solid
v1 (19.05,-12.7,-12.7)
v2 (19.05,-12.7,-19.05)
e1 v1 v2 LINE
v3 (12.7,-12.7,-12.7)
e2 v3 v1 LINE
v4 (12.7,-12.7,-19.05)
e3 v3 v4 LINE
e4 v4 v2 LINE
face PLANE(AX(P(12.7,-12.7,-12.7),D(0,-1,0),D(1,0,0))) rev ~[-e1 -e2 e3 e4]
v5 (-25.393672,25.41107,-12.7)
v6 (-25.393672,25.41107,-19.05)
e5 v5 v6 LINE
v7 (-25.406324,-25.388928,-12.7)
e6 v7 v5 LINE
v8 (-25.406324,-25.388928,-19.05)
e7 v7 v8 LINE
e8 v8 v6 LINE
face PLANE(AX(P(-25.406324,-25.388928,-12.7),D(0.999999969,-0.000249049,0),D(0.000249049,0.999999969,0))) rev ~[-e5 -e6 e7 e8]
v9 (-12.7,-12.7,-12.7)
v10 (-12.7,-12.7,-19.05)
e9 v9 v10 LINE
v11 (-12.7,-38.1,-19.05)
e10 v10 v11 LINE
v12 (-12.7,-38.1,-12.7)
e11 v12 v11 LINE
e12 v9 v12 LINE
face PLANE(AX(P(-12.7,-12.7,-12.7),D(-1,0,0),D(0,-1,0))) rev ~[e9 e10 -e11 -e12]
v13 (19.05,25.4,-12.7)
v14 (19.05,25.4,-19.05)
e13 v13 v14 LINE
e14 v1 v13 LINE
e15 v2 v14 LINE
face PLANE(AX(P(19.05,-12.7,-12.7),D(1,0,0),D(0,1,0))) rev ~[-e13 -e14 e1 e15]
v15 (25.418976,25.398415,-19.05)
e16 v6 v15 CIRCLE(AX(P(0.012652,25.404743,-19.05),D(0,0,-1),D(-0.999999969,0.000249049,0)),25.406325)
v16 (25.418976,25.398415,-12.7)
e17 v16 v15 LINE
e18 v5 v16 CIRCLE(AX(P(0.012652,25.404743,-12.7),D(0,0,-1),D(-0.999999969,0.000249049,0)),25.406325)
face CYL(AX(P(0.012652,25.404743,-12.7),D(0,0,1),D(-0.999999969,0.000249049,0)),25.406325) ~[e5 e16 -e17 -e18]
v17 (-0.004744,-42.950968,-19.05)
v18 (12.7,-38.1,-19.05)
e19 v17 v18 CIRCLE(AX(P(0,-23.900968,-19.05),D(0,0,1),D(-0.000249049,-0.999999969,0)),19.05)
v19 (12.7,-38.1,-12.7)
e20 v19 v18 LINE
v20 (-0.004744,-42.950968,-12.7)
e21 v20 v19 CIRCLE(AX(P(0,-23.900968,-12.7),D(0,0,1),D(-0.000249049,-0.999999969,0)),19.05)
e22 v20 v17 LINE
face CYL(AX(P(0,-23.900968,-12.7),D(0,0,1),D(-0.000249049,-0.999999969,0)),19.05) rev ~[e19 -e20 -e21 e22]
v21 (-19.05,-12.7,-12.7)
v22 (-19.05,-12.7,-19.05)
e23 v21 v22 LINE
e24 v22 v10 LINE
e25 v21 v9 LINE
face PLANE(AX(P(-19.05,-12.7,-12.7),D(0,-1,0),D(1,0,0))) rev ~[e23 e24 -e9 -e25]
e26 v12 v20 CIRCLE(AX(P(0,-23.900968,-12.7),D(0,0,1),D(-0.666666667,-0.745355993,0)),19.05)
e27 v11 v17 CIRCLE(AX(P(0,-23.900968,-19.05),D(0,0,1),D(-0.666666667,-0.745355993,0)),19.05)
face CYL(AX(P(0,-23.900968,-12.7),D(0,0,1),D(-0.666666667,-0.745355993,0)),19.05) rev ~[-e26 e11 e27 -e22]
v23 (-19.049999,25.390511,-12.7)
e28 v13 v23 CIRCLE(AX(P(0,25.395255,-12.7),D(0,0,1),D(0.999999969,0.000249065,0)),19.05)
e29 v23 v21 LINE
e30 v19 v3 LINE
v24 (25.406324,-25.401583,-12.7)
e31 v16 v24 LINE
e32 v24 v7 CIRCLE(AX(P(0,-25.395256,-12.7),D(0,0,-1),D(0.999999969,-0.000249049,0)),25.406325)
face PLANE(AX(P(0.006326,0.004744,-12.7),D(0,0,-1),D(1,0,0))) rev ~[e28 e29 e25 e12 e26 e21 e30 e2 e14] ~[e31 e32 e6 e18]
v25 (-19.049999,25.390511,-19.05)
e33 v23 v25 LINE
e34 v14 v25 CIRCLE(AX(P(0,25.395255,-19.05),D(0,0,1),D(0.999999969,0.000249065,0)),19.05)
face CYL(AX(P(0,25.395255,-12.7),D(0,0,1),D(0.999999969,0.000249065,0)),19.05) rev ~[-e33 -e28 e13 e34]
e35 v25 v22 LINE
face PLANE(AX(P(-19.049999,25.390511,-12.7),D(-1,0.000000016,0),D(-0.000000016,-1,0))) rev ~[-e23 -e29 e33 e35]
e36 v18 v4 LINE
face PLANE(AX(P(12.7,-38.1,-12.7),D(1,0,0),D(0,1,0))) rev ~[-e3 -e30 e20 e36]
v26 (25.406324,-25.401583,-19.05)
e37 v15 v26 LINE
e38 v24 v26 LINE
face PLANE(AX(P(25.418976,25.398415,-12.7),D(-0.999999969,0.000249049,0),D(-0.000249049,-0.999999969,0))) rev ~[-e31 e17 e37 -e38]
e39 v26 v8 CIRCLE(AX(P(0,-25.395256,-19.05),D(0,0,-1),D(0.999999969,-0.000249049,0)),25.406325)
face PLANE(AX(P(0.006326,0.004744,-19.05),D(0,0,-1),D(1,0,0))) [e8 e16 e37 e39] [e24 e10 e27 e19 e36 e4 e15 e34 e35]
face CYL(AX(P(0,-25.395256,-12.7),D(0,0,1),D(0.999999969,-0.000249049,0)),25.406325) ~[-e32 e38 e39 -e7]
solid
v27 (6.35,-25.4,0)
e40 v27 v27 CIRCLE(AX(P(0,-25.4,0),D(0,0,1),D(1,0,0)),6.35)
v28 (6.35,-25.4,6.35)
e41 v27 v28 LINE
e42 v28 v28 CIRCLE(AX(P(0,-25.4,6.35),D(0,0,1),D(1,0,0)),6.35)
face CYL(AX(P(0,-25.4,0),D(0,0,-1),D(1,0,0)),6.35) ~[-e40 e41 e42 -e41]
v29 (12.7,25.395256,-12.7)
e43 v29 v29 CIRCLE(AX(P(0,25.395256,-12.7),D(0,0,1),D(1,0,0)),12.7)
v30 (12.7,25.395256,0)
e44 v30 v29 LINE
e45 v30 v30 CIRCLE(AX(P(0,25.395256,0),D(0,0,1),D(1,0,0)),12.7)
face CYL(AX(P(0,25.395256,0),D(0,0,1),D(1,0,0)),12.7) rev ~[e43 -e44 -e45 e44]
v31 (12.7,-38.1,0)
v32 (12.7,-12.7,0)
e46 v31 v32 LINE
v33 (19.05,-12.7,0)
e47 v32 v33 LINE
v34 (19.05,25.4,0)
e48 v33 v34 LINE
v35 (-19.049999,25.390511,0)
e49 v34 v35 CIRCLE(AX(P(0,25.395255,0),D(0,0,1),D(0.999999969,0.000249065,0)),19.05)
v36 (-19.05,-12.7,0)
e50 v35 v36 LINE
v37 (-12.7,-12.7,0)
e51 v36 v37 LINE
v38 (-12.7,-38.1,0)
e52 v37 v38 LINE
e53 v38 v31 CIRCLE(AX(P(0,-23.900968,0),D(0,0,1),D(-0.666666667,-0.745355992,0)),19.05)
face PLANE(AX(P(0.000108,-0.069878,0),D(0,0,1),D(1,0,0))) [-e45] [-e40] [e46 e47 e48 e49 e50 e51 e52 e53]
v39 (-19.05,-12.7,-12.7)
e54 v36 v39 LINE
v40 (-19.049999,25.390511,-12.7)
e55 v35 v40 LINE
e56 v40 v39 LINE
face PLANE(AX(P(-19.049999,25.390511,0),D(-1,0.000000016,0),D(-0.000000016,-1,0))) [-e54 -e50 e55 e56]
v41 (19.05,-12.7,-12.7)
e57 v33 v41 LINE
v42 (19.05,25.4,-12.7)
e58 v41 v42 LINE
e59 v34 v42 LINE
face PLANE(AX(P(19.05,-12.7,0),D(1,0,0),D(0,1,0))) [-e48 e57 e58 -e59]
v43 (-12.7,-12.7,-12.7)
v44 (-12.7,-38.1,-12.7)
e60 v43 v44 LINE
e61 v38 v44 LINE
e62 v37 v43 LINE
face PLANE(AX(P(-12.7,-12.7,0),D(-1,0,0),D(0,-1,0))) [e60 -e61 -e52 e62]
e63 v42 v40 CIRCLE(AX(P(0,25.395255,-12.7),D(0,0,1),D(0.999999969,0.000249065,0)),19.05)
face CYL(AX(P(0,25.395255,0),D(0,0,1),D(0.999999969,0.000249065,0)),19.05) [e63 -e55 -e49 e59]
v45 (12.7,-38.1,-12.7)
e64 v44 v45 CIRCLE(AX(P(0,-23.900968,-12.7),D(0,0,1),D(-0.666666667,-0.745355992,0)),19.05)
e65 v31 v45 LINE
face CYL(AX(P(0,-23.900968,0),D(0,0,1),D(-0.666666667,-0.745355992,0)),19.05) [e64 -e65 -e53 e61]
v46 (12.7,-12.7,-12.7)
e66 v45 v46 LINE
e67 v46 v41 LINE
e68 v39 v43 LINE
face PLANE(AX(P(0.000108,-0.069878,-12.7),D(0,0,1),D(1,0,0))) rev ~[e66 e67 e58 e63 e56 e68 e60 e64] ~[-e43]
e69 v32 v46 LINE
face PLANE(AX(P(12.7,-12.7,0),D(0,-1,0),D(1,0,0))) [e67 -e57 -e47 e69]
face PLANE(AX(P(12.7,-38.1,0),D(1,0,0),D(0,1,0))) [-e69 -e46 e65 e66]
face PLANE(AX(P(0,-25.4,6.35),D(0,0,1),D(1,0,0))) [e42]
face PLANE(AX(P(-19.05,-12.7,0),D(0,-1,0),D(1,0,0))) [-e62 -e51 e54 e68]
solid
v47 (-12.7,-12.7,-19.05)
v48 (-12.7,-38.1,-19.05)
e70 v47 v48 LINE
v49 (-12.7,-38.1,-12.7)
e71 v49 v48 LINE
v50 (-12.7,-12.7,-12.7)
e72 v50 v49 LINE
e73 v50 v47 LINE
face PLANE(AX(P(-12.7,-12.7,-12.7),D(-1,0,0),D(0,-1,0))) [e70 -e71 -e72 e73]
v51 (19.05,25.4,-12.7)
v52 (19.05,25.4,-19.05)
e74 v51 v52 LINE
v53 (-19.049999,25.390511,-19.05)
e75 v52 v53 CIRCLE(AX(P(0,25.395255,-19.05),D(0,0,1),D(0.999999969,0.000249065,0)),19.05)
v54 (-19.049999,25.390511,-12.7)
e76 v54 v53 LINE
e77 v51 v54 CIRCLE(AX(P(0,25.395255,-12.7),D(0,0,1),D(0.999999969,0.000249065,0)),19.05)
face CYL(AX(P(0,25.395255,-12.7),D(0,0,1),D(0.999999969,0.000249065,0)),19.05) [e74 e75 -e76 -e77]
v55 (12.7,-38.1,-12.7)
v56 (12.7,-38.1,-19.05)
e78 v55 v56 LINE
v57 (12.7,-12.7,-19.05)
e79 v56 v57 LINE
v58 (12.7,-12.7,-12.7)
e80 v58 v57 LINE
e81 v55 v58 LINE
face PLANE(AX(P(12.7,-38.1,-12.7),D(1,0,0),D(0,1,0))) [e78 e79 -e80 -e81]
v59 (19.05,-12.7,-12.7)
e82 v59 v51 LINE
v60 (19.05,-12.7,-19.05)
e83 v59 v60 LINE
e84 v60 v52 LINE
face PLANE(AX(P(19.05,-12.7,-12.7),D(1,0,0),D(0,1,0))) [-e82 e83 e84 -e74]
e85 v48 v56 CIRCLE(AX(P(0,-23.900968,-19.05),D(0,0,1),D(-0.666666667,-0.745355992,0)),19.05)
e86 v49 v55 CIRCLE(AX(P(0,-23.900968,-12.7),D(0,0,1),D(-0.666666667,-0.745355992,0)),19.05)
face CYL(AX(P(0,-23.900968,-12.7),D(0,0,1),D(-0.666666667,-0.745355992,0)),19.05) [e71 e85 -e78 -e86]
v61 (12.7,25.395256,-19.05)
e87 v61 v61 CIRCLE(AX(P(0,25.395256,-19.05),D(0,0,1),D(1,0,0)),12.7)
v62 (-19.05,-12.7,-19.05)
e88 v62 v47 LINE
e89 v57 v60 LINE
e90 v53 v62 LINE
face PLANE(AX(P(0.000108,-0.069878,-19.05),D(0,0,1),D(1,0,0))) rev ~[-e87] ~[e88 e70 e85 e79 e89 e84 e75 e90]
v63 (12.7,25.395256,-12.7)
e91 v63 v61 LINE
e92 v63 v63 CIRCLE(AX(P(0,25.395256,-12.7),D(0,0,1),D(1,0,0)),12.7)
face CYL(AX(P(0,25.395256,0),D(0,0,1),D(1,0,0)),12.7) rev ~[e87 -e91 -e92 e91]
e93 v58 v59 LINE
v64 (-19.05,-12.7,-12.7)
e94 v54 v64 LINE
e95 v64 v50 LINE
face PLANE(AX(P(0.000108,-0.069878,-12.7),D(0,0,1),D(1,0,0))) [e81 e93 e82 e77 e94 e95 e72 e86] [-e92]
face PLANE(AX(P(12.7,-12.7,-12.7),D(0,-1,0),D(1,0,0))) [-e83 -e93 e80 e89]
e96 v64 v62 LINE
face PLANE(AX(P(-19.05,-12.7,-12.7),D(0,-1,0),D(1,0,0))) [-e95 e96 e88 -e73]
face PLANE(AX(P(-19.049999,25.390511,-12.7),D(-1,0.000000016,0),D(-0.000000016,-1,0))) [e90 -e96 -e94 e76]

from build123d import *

# Parameters (mm, degrees)
F1_DEPTH = 12.7
F2_R     = 6.35
F3_DEPTH = 6.35
F5_DEPTH = 6.35
F6_DEPTH = 6.35
F7_R     = 12.7
F8_DEPTH = 19.051


# Not quite as in the source:
# - ends of sketch curves that miss each other by under 0.0002 mm in the source are joined


with BuildPart() as f1:
    # F0 (on Top) → F1 (new body)
    with BuildSketch(Plane.XY):
        with BuildLine():
            Line((19.05, -12.7), (19.05, 25.4))
            ThreePointArc((19.05, 25.4), (-0.0047443873, 44.4452550218), (-19.0499994092, 25.3905112253))
            Line((-19.0499994092, 25.3905112253), (-19.05, -12.7))
            Line((-19.05, -12.7), (-12.7, -12.7))
            Line((-12.7, -12.7), (-12.7, -38.1))
            ThreePointArc((-12.7, -38.1), (0, -42.9509683429), (12.7, -38.1))
            Line((12.7, -38.1), (12.7, -12.7))
            Line((12.7, -12.7), (19.05, -12.7))
        make_face()
    extrude(amount=-F1_DEPTH)

    # F2 (on face) → F3 (join)
    with BuildSketch(Plane.XY):
        with Locations((0, -25.4)):
            Circle(F2_R)
    extrude(amount=F3_DEPTH)


with BuildPart() as f5:
    # F4 (on face) → F5 (new body)
    with BuildSketch(Plane(origin=(0, 0, -12.7), x_dir=(1, 0, 0), z_dir=(0, 0, -1))):
        with BuildLine():
            Line((25.4189755796, -25.3984153871), (25.4063238802, 25.4015830374))
            ThreePointArc((25.4063238802, 25.4015830374), (-0.0063274248, 50.8015794928), (-25.4063238802, 25.3889281877))
            Line((-25.4063238802, 25.3889281877), (-25.3936721808, -25.4110702368))
            ThreePointArc((-25.3936721808, -25.4110702368), (0.0189791242, -50.8110666922), (25.4189755796, -25.3984153871))
        make_face()
        with BuildLine():
            Line((12.7, 38.1), (12.7, 25.3952556126))
            Line((12.7, 25.3952556126), (12.7, 12.7))
            Line((12.7, 12.7), (19.05, 12.7))
            Line((19.05, 12.7), (19.05, -25.4))
            ThreePointArc((19.05, -25.4), (-0.0047440919, -44.4452550219), (-19.0499994092, -25.3905112253))
            Line((-19.0499994092, -25.3905112253), (-19.05, 12.7))
            Line((-19.05, 12.7), (-12.7, 12.7))
            Line((-12.7, 12.7), (-12.7, 25.3952556126))
            Line((-12.7, 25.3952556126), (-12.7, 38.1))
            ThreePointArc((-12.7, 38.1), (-6.7996767952, 41.696105192), (-0.0047443873, 42.9509677521))
            ThreePointArc((-0.0047443873, 42.9509677521), (6.7952447197, 41.6977980942), (12.7, 38.1))
        make_face(mode=Mode.SUBTRACT)
    extrude(amount=F5_DEPTH)


with BuildPart() as f6:
    # F6 (new): a face of the model
    f6_faces = [f1.part.faces().sort_by_distance(p)[0] for p in [
        (1.391e-07, 3.0992224533, -12.7),
    ]]
    extrude(f6_faces, amount=F6_DEPTH)


with BuildPart() as f8_tool:
    # F7 (on face) → F8 (new body, through all)
    with BuildSketch(Plane.XY):
        with Locations((2.954e-07, 25.3952556127)):
            Circle(F7_R)
    extrude(amount=-F8_DEPTH)


with BuildPart() as f1_1:
    add(f1.part)

    # F8: cut by f8_tool
    add(f8_tool.part, mode=Mode.SUBTRACT)


with BuildPart() as f6_1:
    add(f6.part)

    # F8: cut by f8_tool
    add(f8_tool.part, mode=Mode.SUBTRACT)


solid = Compound([f5.part, f1_1.part, f6_1.part])
